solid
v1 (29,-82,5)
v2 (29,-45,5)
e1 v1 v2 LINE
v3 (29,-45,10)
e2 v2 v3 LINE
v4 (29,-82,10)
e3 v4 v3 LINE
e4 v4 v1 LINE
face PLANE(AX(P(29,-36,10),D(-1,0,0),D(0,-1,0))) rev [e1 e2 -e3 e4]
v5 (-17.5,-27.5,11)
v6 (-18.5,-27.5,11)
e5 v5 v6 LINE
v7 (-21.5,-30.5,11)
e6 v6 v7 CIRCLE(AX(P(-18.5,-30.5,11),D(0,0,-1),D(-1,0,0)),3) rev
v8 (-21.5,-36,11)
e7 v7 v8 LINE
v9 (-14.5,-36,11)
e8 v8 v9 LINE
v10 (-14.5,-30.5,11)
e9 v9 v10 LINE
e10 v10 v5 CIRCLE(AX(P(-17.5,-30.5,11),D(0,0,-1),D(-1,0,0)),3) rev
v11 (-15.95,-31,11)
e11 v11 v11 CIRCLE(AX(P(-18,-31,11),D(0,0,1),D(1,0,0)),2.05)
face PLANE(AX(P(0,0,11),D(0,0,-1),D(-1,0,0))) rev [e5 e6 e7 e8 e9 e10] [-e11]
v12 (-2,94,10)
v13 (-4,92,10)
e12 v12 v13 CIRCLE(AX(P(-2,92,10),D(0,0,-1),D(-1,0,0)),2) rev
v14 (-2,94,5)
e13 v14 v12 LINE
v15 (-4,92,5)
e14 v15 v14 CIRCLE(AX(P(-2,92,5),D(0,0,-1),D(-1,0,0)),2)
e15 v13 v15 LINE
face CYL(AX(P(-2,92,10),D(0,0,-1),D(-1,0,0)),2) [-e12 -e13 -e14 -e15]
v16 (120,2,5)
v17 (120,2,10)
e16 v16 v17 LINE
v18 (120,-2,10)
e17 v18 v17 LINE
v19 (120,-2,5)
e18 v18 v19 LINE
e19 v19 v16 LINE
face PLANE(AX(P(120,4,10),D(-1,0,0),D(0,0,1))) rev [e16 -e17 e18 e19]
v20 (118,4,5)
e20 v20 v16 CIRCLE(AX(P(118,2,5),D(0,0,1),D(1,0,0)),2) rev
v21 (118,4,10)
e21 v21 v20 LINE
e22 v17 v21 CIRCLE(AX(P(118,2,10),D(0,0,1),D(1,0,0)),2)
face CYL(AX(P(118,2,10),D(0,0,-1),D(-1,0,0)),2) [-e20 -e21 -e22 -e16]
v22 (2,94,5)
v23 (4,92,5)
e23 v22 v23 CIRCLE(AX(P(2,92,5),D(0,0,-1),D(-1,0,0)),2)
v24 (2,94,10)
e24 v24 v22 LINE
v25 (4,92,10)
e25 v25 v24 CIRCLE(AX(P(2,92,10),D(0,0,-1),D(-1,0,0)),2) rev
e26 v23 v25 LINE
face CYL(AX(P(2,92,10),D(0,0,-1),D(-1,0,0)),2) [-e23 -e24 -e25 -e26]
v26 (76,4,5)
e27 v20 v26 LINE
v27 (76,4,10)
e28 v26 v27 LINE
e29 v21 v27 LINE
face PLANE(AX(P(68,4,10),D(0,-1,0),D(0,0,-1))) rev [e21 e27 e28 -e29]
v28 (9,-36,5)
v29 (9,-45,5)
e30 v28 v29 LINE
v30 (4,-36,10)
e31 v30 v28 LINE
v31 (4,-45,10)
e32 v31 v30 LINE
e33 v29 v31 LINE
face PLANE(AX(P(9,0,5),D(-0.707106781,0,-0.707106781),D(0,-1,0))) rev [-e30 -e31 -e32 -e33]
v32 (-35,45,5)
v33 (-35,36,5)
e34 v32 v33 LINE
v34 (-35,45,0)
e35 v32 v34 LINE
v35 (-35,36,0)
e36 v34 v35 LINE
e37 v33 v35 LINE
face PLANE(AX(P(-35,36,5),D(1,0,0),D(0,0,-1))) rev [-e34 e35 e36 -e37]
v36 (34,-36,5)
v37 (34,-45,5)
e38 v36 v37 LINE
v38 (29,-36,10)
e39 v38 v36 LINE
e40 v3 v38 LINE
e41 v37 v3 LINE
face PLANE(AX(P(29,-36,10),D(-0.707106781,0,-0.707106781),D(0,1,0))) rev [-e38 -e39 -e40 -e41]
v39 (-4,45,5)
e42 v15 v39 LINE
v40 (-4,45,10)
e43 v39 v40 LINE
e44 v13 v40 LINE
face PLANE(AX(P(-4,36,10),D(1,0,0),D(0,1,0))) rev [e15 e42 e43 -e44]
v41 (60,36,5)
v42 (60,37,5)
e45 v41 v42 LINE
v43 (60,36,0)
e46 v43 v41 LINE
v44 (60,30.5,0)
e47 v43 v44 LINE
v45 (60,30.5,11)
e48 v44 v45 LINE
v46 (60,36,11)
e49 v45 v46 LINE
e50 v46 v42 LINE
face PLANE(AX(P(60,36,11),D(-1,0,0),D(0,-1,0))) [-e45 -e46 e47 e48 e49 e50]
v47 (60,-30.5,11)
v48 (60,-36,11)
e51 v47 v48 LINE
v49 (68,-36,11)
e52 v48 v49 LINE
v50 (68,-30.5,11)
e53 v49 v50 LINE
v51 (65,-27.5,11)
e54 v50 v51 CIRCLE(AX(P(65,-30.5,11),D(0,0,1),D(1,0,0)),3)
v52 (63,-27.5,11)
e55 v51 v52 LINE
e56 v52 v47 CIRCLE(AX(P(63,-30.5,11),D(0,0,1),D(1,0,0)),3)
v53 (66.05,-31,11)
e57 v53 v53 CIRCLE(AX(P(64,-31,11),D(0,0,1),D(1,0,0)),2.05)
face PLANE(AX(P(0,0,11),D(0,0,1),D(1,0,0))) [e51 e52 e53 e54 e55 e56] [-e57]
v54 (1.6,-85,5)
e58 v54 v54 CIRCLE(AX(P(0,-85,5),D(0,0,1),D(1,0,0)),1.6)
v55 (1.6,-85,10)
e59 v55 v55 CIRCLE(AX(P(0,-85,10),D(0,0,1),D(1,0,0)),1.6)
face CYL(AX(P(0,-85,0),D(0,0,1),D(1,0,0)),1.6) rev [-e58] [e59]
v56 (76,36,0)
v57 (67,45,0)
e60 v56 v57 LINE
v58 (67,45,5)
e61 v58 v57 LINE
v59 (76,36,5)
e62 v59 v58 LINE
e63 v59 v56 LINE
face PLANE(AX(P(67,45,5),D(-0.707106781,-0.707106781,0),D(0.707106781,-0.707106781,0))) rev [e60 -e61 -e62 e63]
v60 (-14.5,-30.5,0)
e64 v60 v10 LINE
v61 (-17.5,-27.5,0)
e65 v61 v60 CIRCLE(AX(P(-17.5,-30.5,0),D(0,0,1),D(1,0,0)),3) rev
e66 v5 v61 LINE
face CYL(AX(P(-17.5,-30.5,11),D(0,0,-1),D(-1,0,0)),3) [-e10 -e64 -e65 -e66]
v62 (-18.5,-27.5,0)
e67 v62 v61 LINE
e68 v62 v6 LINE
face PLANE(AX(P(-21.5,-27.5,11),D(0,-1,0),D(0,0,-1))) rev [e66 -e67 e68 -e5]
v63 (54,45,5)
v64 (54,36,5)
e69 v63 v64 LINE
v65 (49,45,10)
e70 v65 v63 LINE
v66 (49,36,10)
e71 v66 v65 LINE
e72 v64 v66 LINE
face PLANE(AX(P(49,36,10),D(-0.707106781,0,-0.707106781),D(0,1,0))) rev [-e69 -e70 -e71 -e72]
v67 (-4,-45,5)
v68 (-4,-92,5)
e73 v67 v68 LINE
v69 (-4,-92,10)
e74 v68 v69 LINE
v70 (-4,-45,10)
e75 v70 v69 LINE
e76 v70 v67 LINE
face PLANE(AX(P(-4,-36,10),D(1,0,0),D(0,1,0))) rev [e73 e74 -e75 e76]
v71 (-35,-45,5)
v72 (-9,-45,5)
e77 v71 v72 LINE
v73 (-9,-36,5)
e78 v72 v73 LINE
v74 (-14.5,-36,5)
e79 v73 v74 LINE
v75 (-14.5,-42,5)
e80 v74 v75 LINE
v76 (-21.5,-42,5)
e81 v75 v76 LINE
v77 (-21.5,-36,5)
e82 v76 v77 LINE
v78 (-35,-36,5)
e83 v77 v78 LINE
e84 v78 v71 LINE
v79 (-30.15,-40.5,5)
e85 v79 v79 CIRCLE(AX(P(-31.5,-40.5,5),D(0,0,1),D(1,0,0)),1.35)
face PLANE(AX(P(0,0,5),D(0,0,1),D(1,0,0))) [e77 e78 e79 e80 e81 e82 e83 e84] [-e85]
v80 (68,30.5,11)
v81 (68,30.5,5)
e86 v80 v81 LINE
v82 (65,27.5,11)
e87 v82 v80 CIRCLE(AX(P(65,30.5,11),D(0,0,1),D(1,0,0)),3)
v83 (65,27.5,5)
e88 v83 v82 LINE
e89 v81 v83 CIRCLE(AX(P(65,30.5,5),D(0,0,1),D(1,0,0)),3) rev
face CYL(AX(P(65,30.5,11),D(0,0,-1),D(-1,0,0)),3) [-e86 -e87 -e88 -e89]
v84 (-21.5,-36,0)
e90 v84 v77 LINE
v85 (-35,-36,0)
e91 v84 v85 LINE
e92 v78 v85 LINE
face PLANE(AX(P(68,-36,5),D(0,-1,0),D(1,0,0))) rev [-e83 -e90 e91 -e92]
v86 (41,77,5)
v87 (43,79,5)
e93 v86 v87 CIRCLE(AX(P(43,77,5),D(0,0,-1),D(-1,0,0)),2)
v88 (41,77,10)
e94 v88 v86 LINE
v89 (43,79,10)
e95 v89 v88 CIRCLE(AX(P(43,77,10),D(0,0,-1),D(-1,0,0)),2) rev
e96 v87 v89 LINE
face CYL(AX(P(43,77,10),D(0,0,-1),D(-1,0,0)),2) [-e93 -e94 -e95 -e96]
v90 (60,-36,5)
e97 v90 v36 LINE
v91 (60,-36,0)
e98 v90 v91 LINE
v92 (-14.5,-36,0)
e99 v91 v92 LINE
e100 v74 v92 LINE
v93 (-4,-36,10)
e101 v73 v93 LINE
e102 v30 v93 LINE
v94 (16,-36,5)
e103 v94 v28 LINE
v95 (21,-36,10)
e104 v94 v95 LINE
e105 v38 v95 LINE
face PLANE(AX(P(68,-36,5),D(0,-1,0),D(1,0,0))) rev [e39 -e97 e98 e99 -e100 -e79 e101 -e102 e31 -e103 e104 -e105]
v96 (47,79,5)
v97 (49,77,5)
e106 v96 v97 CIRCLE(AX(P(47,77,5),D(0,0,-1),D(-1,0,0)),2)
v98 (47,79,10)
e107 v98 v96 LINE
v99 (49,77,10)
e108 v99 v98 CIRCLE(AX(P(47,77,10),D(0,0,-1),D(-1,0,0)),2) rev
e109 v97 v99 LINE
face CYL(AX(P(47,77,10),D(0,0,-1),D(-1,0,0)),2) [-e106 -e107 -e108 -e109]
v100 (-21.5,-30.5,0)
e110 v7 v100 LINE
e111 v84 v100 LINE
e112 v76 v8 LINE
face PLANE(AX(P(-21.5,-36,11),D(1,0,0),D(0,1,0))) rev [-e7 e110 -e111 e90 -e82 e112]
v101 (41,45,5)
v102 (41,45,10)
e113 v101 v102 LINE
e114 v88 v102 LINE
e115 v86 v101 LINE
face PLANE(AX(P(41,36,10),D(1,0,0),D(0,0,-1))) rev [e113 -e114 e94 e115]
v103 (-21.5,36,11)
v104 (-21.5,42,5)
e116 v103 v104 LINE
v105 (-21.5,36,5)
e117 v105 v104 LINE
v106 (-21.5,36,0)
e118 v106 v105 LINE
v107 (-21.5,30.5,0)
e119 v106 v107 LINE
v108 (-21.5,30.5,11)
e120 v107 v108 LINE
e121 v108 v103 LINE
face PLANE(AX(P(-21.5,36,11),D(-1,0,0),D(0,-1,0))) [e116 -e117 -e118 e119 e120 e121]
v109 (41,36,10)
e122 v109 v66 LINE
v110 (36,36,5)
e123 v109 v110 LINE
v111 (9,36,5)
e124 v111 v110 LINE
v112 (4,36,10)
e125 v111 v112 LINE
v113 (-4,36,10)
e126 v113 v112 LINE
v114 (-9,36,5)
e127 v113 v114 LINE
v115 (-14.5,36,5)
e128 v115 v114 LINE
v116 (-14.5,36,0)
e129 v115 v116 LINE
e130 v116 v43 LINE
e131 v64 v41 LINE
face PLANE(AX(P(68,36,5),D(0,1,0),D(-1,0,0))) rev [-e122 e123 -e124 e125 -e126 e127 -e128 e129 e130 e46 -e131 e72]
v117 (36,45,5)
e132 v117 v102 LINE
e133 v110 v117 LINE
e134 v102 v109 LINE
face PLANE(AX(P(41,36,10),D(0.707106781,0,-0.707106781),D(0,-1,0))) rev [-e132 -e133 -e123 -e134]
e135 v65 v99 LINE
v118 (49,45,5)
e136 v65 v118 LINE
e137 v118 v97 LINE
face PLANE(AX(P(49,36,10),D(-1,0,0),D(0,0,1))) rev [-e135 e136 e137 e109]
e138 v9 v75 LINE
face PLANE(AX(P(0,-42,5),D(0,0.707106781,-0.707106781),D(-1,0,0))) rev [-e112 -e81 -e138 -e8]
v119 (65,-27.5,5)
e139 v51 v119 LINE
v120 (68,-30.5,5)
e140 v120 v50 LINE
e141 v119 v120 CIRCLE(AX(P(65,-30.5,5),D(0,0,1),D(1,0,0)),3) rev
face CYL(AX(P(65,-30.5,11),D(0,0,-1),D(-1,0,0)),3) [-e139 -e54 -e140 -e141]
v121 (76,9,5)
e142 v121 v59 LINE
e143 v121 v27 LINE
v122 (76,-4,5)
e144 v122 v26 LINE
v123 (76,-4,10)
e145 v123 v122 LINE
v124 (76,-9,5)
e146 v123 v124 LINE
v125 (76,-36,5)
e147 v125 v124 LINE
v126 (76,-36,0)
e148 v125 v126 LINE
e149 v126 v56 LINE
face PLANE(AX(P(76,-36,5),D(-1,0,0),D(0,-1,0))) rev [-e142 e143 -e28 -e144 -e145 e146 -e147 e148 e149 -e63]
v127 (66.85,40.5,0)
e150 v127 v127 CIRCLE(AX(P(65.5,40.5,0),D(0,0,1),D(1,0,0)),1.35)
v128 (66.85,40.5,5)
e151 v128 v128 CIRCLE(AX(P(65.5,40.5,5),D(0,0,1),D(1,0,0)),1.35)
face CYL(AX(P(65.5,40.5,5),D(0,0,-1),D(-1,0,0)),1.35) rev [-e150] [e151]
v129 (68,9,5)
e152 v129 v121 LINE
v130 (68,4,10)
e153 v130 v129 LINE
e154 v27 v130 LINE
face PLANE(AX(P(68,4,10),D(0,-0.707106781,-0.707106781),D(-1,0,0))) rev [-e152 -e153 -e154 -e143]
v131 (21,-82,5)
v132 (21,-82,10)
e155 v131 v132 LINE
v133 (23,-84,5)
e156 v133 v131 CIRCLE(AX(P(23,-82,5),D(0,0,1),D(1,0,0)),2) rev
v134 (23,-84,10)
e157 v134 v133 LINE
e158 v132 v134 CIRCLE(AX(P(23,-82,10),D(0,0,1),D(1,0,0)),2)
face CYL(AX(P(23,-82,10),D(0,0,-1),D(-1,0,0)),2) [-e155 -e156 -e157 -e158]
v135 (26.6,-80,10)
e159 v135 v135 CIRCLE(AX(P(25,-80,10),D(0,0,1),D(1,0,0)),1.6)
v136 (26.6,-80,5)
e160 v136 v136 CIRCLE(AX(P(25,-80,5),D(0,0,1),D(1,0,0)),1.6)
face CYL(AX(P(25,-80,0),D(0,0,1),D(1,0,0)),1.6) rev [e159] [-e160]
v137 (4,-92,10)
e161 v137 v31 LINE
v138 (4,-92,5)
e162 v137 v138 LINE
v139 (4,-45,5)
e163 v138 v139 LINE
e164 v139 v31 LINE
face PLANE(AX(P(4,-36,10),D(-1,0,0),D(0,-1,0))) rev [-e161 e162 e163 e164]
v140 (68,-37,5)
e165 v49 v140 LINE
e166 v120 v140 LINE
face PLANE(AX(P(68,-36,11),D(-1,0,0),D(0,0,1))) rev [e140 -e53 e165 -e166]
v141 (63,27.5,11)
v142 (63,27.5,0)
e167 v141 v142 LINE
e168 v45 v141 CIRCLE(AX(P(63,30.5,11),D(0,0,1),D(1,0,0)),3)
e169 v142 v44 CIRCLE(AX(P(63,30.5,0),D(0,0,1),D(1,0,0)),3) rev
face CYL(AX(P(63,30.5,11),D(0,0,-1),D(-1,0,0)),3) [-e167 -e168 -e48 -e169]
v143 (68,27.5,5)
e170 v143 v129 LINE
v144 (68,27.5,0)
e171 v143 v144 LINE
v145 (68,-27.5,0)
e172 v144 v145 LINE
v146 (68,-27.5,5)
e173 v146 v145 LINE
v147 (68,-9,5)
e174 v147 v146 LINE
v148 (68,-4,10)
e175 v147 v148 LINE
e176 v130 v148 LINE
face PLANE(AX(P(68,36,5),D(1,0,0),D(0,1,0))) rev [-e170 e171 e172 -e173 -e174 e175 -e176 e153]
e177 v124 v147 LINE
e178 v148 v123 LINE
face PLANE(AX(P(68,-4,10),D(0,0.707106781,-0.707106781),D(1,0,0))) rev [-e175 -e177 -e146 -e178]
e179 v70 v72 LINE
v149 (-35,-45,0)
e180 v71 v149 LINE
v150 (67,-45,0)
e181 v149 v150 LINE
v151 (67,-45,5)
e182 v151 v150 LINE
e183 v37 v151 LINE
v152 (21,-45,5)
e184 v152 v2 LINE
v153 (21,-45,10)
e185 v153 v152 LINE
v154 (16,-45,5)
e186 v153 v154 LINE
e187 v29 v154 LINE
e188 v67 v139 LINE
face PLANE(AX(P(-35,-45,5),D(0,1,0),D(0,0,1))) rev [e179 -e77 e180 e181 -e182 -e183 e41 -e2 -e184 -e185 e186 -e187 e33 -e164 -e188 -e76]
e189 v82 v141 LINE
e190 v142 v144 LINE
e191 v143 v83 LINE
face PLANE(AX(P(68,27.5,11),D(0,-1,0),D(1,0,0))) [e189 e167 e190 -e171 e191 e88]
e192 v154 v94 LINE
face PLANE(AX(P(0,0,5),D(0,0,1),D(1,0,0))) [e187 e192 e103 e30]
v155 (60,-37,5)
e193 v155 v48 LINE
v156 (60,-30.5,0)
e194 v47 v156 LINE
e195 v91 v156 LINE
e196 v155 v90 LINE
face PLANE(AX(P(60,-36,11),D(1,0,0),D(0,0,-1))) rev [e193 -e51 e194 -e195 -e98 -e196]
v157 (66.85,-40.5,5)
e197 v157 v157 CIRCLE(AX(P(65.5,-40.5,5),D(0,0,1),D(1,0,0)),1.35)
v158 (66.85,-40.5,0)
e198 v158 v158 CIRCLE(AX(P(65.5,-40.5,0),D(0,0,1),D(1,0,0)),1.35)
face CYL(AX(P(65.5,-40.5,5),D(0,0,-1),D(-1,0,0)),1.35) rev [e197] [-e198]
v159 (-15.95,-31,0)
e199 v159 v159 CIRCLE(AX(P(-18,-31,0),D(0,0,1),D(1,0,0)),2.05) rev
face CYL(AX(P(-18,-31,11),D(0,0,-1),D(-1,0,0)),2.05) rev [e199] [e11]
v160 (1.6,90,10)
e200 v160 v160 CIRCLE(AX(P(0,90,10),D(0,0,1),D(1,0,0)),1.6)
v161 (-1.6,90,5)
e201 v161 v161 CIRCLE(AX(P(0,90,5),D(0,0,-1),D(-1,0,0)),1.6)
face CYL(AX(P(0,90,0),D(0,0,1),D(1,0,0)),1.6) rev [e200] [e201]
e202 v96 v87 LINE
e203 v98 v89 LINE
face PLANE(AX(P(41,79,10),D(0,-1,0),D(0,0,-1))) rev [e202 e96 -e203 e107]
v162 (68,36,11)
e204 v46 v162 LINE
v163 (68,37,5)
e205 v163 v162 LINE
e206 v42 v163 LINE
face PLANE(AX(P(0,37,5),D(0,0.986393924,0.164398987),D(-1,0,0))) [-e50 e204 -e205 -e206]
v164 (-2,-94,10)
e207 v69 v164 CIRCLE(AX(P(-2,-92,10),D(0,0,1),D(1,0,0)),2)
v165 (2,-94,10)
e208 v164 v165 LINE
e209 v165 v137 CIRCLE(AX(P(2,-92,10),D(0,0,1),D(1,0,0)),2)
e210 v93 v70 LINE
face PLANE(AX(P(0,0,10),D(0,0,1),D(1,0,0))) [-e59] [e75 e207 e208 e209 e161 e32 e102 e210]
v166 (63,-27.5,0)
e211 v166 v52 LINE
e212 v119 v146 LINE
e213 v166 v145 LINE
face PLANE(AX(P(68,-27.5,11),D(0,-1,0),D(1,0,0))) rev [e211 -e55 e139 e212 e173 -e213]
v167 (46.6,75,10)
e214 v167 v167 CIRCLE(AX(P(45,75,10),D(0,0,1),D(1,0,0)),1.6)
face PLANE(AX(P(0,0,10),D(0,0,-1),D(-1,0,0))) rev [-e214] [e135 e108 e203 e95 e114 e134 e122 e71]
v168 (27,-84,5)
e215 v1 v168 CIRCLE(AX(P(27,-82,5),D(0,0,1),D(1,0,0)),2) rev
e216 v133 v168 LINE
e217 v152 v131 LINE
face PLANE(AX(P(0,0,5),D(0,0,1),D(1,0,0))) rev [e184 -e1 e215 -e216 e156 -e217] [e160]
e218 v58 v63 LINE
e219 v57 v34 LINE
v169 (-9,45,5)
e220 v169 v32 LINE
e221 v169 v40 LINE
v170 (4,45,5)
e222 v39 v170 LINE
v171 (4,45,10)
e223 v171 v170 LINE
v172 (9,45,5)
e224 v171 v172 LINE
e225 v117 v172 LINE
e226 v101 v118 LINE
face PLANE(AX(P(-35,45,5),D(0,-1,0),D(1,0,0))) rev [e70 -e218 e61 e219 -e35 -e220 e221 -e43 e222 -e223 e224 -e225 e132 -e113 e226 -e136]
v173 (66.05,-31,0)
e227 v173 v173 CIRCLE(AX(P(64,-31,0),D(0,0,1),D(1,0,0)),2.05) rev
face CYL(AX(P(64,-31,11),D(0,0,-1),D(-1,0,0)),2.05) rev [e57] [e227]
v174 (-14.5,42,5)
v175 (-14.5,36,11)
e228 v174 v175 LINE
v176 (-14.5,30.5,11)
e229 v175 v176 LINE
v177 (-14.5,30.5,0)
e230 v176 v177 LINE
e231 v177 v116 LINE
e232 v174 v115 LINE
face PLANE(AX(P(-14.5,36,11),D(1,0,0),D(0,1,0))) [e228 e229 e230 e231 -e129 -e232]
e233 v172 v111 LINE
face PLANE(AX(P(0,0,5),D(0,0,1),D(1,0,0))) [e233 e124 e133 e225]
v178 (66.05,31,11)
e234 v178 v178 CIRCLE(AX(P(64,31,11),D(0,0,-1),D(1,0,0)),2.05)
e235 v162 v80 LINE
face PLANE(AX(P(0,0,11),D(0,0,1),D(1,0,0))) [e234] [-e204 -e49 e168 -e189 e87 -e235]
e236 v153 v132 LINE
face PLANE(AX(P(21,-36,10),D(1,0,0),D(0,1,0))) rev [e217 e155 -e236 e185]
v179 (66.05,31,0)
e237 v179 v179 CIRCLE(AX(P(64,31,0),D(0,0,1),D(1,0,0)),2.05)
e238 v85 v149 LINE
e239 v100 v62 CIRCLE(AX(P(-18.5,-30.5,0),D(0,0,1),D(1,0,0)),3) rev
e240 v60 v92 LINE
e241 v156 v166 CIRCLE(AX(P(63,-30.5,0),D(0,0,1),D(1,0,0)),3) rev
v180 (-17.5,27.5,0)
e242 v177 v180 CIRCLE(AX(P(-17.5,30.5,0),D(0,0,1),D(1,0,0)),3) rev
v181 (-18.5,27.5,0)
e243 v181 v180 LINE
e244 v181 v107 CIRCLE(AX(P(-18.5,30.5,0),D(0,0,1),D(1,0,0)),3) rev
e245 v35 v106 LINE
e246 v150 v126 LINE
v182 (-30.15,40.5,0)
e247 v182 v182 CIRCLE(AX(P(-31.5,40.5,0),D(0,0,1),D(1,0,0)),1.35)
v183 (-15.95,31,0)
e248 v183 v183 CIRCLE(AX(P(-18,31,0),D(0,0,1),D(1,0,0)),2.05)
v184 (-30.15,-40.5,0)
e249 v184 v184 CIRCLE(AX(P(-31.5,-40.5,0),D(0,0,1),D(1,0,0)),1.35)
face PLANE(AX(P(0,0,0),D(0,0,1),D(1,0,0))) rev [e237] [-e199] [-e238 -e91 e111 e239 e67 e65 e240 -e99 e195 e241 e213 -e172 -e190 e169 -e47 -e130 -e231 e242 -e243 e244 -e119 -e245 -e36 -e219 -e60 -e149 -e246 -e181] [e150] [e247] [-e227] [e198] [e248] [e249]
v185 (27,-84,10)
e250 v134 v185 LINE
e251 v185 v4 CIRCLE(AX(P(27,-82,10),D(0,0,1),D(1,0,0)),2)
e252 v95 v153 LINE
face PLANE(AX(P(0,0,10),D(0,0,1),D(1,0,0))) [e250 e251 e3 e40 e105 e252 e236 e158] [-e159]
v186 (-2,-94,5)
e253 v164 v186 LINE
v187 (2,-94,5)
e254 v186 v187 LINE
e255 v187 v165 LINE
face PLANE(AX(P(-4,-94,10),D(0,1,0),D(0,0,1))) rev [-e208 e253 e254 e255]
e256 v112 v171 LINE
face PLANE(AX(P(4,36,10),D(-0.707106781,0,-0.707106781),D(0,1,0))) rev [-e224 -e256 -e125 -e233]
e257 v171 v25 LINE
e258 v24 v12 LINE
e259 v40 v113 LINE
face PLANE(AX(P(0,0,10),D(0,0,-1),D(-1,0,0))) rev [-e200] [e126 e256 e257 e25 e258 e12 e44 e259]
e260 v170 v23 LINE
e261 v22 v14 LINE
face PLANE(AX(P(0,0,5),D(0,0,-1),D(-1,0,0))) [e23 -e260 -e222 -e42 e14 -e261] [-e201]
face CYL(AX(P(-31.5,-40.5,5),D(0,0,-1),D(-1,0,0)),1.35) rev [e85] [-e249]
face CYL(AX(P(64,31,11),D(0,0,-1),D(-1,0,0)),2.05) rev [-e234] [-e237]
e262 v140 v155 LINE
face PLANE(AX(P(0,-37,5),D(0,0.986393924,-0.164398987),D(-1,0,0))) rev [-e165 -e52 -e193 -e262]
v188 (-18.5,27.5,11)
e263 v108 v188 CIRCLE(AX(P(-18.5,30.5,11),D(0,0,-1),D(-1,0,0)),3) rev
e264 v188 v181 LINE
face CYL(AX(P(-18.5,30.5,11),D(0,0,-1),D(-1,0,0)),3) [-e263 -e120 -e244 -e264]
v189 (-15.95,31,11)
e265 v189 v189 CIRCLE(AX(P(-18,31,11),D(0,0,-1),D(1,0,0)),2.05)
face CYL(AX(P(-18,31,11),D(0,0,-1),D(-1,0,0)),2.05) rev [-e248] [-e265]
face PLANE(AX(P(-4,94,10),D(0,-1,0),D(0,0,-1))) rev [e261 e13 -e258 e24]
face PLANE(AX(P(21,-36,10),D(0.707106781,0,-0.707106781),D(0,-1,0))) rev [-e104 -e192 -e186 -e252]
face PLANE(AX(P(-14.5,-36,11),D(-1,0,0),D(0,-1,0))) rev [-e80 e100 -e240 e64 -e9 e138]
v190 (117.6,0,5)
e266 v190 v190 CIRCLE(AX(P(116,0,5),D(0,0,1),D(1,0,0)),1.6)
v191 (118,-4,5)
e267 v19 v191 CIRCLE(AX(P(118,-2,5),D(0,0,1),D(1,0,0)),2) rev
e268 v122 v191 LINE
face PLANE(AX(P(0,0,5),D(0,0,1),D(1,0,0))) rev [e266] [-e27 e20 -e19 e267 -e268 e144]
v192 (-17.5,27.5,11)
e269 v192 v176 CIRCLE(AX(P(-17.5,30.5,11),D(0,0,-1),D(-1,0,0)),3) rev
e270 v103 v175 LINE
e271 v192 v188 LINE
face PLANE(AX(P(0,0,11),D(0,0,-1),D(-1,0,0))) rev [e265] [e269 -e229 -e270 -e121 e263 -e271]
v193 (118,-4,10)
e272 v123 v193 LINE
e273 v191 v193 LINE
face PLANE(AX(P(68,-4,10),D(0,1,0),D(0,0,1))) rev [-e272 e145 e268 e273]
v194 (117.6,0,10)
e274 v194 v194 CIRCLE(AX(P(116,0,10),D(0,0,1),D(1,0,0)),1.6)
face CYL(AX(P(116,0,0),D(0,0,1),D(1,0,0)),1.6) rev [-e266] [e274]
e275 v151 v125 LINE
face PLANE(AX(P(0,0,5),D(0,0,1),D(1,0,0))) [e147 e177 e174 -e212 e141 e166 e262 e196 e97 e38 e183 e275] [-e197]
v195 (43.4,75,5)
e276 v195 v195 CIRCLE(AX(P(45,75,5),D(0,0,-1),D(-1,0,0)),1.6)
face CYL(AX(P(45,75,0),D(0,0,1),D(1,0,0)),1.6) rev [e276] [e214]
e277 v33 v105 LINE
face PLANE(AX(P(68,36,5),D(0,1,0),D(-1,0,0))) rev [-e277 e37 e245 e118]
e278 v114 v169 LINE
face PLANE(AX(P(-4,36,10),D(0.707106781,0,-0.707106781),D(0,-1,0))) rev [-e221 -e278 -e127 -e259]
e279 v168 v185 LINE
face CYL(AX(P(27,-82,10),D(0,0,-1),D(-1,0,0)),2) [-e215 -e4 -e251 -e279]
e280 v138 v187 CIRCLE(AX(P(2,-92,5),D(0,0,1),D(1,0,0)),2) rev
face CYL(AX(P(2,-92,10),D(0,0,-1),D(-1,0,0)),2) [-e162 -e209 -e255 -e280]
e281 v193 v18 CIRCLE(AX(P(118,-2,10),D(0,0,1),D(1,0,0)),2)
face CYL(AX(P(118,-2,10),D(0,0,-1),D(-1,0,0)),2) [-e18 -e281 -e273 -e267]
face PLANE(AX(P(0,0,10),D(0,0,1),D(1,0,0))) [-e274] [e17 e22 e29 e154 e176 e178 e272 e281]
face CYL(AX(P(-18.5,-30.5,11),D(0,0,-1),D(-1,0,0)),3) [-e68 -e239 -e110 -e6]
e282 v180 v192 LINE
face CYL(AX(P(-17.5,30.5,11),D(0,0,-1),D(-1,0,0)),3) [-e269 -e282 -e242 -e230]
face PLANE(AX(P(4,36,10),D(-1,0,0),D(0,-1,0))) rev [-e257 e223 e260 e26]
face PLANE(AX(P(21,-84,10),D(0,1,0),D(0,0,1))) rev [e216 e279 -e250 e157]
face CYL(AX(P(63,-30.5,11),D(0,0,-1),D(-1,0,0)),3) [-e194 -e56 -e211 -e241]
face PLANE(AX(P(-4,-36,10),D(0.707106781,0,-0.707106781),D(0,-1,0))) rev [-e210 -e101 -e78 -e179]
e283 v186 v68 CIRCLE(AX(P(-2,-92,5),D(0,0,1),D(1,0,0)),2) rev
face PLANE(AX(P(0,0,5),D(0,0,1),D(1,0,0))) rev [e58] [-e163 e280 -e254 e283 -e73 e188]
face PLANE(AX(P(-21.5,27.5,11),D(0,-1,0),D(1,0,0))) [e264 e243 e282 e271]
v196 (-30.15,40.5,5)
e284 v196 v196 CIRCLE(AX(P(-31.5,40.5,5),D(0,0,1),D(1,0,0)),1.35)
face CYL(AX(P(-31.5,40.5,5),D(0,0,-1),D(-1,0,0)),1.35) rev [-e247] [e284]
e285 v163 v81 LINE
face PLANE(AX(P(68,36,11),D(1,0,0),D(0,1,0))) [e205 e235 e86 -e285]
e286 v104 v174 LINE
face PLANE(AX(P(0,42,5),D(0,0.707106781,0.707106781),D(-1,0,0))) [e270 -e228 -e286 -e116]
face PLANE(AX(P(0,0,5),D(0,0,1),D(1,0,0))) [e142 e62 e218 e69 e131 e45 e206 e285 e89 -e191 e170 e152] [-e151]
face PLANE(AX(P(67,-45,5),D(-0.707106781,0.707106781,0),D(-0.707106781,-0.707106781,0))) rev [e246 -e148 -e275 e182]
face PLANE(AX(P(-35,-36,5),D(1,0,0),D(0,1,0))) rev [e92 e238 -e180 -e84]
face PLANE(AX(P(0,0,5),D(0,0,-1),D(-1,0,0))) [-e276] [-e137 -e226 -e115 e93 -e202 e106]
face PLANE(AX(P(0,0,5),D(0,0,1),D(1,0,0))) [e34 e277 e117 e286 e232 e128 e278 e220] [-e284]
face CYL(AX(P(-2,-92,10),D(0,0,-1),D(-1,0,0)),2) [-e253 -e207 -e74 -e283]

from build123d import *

# Parameters (mm, degrees)
SKETCH2_R           = 1.35
BOSS_EXTRUDE2_DEPTH = 5
BOSS_EXTRUDE3_START = -5
SKETCH3_W           = 7
SKETCH3_H           = 8.5
SKETCH3_R           = 2.05
SKETCH3_W_2         = 8
BOSS_EXTRUDE3_DEPTH = 11
FILLET1_R           = 3
CHAMFER1_SIZE       = 6
CHAMFER2_SIZE2      = 6
CHAMFER2_SIZE       = 1
FILLET2_R           = 3
CHAMFER4_SIZE       = 6
CHAMFER5_SIZE2      = 6
CHAMFER5_SIZE       = 1
SKETCH4_W           = 8
SKETCH4_H           = 9
BOSS_EXTRUDE4_DEPTH = 8
SKETCH5_R           = 2.05
CUT_EXTRUDE1_DEPTH  = 9
SKETCH6_W           = 8
SKETCH6_H           = 8
BOSS_EXTRUDE5_DEPTH = 8
SKETCH7_R           = 2.05
CUT_EXTRUDE2_DEPTH  = 8
SKETCH8_W           = 8
SKETCH8_H           = 9
SKETCH8_H_2         = 8
CUT_EXTRUDE4_DEPTH  = 8
SKETCH9_W           = 8
SKETCH9_H           = 58
SKETCH9_H_2         = 43
SKETCH9_H_3         = 48
SKETCH9_W_2         = 52
SKETCH9_H_4         = 8
BOSS_EXTRUDE6_DEPTH = 5
SKETCH10_R          = 1.6
CUT_EXTRUDE5_DEPTH  = 153.761251631
FILLET3_R           = 2
CHAMFER6_SIZE       = 5


# Some blends are built 0.0001 mm under size
with BuildPart() as part:
    # Sketch2 → Boss-Extrude2 (new body)
    with BuildSketch(Plane.XY):
        Polygon((-35, -45), (67, -45), (76, -36), (76, 36), (67, 45), (-35, 45), (-35, 36), (68, 36), (68, -36), (-35, -36), align=None)
        with Locations((-31.5, -40.5)):
            Circle(SKETCH2_R, mode=Mode.SUBTRACT)
        with Locations((-31.5, 40.5)):
            Circle(SKETCH2_R, mode=Mode.SUBTRACT)
        with Locations((65.5, 40.5)):
            Circle(SKETCH2_R, mode=Mode.SUBTRACT)
        with Locations((65.5, -40.5)):
            Circle(SKETCH2_R, mode=Mode.SUBTRACT)
    extrude(amount=BOSS_EXTRUDE2_DEPTH)

    # Sketch3 → Boss-Extrude3 (add)
    # profile 1 of 2: a face of its own
    with BuildSketch(Plane.XY.offset(5).offset(BOSS_EXTRUDE3_START)):
        with Locations((-18, -31.75)):
            Rectangle(SKETCH3_W, SKETCH3_H)
        with Locations((-18, -31)):
            Circle(SKETCH3_R, mode=Mode.SUBTRACT)
    # profile 2 of 2: a face of its own
    with BuildSketch(Plane.XY.offset(5).offset(BOSS_EXTRUDE3_START)):
        with Locations((64, -31.75)):
            Rectangle(SKETCH3_W_2, SKETCH3_H)
        with Locations((64, -31)):
            Circle(SKETCH3_R, mode=Mode.SUBTRACT)
    boss_extrude3 = extrude(amount=BOSS_EXTRUDE3_DEPTH)

    # Fillet1
    fillet1_edges = [part.edges().sort_by_distance(p)[0] for p in [
        (-21.5, -27.5, 5.5),
        (-14.5, -27.5, 5.5),
        (68, -27.5, 8),
        (60, -27.5, 5.5),
    ]]
    fillet(fillet1_edges, radius=FILLET1_R)

    # Chamfer1
    chamfer1_edges = [part.edges().sort_by_distance(p)[0] for p in [
        (-18, -36, 5),
    ]]
    chamfer(chamfer1_edges, length=CHAMFER1_SIZE - 0.0001)  # a hair under: the kernel refuses the full size

    # Chamfer2
    chamfer2_edges = [part.edges().sort_by_distance(p)[0] for p in [
        (64, -36, 5),
    ]]
    chamfer2_side = [part.faces().sort_by_distance(p)[0] for p in [
        (64, -36.02, 5),
    ]]
    chamfer(chamfer2_edges, length=CHAMFER2_SIZE - 0.0001, length2=CHAMFER2_SIZE2 - 0.0001, reference=chamfer2_side[0])  # a hair under: the kernel refuses the full size

    # Mirror5: Boss-Extrude3 across plane
    add(boss_extrude3.mirror(Plane(origin=(0, 0, 0), x_dir=(0, 0, 1), z_dir=(0, -1, 0))))

    # Fillet2
    fillet2_edges = [part.edges().sort_by_distance(p)[0] for p in [
        (-21.5, 27.5, 5.5),
        (-14.5, 27.5, 5.5),
        (68, 27.5, 8),
        (60, 27.5, 5.5),
    ]]
    fillet(fillet2_edges, radius=FILLET2_R)

    # Chamfer4
    chamfer4_edges = [part.edges().sort_by_distance(p)[0] for p in [
        (-18, 36, 5),
    ]]
    chamfer(chamfer4_edges, length=CHAMFER4_SIZE - 0.0001)  # a hair under: the kernel refuses the full size

    # Chamfer5
    chamfer5_edges = [part.edges().sort_by_distance(p)[0] for p in [
        (64, 36, 5),
    ]]
    chamfer5_side = [part.faces().sort_by_distance(p)[0] for p in [
        (64, 36.02, 5),
    ]]
    chamfer(chamfer5_edges, length=CHAMFER5_SIZE - 0.0001, length2=CHAMFER5_SIZE2 - 0.0001, reference=chamfer5_side[0])  # a hair under: the kernel refuses the full size

    # Sketch4 → Boss-Extrude4 (add)
    with BuildSketch(Plane.XY.offset(5)):
        with Locations((-1, -40.5)):
            Rectangle(SKETCH4_W, SKETCH4_H)
        with Locations((32, -40.5)):
            Rectangle(SKETCH4_W, SKETCH4_H)
    boss_extrude4 = extrude(amount=BOSS_EXTRUDE4_DEPTH)

    # Sketch5 → Cut-Extrude1 (cut)
    with BuildSketch(Plane.XZ.offset(45)):
        with Locations(Location((-1, 9.5, 0), (0, 0, 270))):
            Circle(SKETCH5_R)
        with Locations(Location((32, 9.5, 0), (0, 0, 270))):
            Circle(SKETCH5_R)
    cut_extrude1 = extrude(amount=-CUT_EXTRUDE1_DEPTH, mode=Mode.SUBTRACT)

    # Mirror6: Boss-Extrude4, Cut-Extrude1 across plane
    add(boss_extrude4.mirror(Plane(origin=(0, 0, 0), x_dir=(0, 0, 1), z_dir=(0, -1, 0))))
    add(cut_extrude1.mirror(Plane(origin=(0, 0, 0), x_dir=(0, 0, 1), z_dir=(0, -1, 0))), mode=Mode.SUBTRACT)

    # Sketch6 → Boss-Extrude5 (add)
    with BuildSketch(Plane.XY.offset(5)):
        with Locations((72, 0)):
            Rectangle(SKETCH6_W, SKETCH6_H)
    extrude(amount=BOSS_EXTRUDE5_DEPTH)

    # Sketch7 → Cut-Extrude2 (cut)
    with BuildSketch(Plane(origin=(76, 0, 0), x_dir=(0, 0, -1), z_dir=(1, 0, 0))):
        with Locations(Location((-9.5, 0, 0), (0, 0, 90))):
            Circle(SKETCH7_R)
    extrude(amount=-CUT_EXTRUDE2_DEPTH, mode=Mode.SUBTRACT)

    # Sketch8 → Cut-Extrude4 (cut)
    with BuildSketch(Plane.XY.offset(5)):
        with Locations((-1, -40.5)):
            Rectangle(SKETCH8_W, SKETCH8_H)
        with Locations((32, -40.5)):
            Rectangle(SKETCH8_W, SKETCH8_H)
        with Locations((72, 0)):
            Rectangle(SKETCH8_W, SKETCH8_H_2)
        with Locations((32, 40.5)):
            Rectangle(SKETCH8_W, SKETCH8_H)
        with Locations((-1, 40.5)):
            Rectangle(SKETCH8_W, SKETCH8_H)
    extrude(amount=CUT_EXTRUDE4_DEPTH, mode=Mode.SUBTRACT)

    # Sketch9 → Boss-Extrude6 (add)
    with BuildSketch(Plane.XY.offset(5)):
        with Locations((0, -65)):
            Rectangle(SKETCH9_W, SKETCH9_H)
        with Locations((0, 65)):
            Rectangle(SKETCH9_W, SKETCH9_H)
        with Locations((45, 57.5)):
            Rectangle(SKETCH9_W, SKETCH9_H_2)
        with Locations((25, -60)):
            Rectangle(SKETCH9_W, SKETCH9_H_3)
        with Locations((94, 0)):
            Rectangle(SKETCH9_W_2, SKETCH9_H_4)
    extrude(amount=BOSS_EXTRUDE6_DEPTH)

    # Sketch10 → Cut-Extrude5 (cut, through all)
    with BuildSketch(Plane.XY.offset(10)):
        with Locations((0, -85)):
            Circle(SKETCH10_R)
        with Locations((0, 90)):
            Circle(SKETCH10_R)
        with Locations((45, 75)):
            Circle(SKETCH10_R)
        with Locations((116, 0)):
            Circle(SKETCH10_R)
        with Locations((25, -80)):
            Circle(SKETCH10_R)
    extrude(amount=-CUT_EXTRUDE5_DEPTH, mode=Mode.SUBTRACT)

    # Fillet3
    fillet3_edges = [part.edges().sort_by_distance(p)[0] for p in [
        (-4, -94, 7.5),
        (4, -94, 7.5),
        (-4, 94, 7.5),
        (4, 94, 7.5),
        (41, 79, 7.5),
        (49, 79, 7.5),
        (21, -84, 7.5),
        (29, -84, 7.5),
        (120, -4, 7.5),
        (120, 4, 7.5),
    ]]
    fillet(fillet3_edges, radius=FILLET3_R)

    # Chamfer6
    # the kernel refuses this chamfer: 5 mm, written as the material it adds along each edge
    with BuildSketch(Plane(origin=(21, -45, 5), x_dir=(-0.9996219169112968, 0, -0.027495876610586317), z_dir=(0, 1, 0)), Plane(origin=(-4, -45, 5), x_dir=(-0.9996219169112968, 0, -0.027495876610586327), z_dir=(0, 1, 0)), Plane(origin=(4, -36, 5), x_dir=(0.9996219169112968, 0, -0.027495876610586317), z_dir=(0, -1, 0)), Plane(origin=(29, -36, 5), x_dir=(0.9996219169112968, 0, -0.027495876610586337), z_dir=(0, -1, 0)), Plane(origin=(49, 36, 5), x_dir=(-0.027495876610586317, 0, 0.9996219169112968), z_dir=(0, 1, 0)), Plane(origin=(-4, 45, 5), x_dir=(0.027495876610586317, 0, 0.9996219169112968), z_dir=(0, -1, 0)), Plane(origin=(4, 36, 5), x_dir=(-0.027495876610586403, 0, 0.9996219169112968), z_dir=(0, 1, 0))) as chamfer6_piece_1:
        Polygon((CHAMFER6_SIZE * 0.999621916911, CHAMFER6_SIZE * 0.0274958766106), (-CHAMFER6_SIZE * 0.0274958766106, CHAMFER6_SIZE * 0.999621916911), (0, 0), align=None)
    extrude(amount=9)
    with BuildSketch(Plane(origin=(68, 4, 5), x_dir=(0, 0.9996219169112968, -0.027495876610586324), z_dir=(1, 0, 0)), Plane(origin=(76, -4, 5), x_dir=(0, -0.9996219169112968, -0.027495876610586324), z_dir=(-1, 0, 0))) as chamfer6_piece_2:
        Polygon((CHAMFER6_SIZE * 0.999621916911, CHAMFER6_SIZE * 0.0274958766106), (-CHAMFER6_SIZE * 0.0274958766106, CHAMFER6_SIZE * 0.999621916911), (0, 0), align=None)
    extrude(amount=8)
    with BuildSketch(Plane(origin=(41, 45, 5), x_dir=(-0.9996219169112968, 0, -0.027495876610586317), z_dir=(0, -1, 0))) as chamfer6_piece_3:
        Polygon((CHAMFER6_SIZE * 0.999621916911, -CHAMFER6_SIZE * 0.0274958766106), (-CHAMFER6_SIZE * 0.0274958766106, -CHAMFER6_SIZE * 0.999621916911), (0, 0), align=None)
    extrude(amount=9)


solid = part.part
